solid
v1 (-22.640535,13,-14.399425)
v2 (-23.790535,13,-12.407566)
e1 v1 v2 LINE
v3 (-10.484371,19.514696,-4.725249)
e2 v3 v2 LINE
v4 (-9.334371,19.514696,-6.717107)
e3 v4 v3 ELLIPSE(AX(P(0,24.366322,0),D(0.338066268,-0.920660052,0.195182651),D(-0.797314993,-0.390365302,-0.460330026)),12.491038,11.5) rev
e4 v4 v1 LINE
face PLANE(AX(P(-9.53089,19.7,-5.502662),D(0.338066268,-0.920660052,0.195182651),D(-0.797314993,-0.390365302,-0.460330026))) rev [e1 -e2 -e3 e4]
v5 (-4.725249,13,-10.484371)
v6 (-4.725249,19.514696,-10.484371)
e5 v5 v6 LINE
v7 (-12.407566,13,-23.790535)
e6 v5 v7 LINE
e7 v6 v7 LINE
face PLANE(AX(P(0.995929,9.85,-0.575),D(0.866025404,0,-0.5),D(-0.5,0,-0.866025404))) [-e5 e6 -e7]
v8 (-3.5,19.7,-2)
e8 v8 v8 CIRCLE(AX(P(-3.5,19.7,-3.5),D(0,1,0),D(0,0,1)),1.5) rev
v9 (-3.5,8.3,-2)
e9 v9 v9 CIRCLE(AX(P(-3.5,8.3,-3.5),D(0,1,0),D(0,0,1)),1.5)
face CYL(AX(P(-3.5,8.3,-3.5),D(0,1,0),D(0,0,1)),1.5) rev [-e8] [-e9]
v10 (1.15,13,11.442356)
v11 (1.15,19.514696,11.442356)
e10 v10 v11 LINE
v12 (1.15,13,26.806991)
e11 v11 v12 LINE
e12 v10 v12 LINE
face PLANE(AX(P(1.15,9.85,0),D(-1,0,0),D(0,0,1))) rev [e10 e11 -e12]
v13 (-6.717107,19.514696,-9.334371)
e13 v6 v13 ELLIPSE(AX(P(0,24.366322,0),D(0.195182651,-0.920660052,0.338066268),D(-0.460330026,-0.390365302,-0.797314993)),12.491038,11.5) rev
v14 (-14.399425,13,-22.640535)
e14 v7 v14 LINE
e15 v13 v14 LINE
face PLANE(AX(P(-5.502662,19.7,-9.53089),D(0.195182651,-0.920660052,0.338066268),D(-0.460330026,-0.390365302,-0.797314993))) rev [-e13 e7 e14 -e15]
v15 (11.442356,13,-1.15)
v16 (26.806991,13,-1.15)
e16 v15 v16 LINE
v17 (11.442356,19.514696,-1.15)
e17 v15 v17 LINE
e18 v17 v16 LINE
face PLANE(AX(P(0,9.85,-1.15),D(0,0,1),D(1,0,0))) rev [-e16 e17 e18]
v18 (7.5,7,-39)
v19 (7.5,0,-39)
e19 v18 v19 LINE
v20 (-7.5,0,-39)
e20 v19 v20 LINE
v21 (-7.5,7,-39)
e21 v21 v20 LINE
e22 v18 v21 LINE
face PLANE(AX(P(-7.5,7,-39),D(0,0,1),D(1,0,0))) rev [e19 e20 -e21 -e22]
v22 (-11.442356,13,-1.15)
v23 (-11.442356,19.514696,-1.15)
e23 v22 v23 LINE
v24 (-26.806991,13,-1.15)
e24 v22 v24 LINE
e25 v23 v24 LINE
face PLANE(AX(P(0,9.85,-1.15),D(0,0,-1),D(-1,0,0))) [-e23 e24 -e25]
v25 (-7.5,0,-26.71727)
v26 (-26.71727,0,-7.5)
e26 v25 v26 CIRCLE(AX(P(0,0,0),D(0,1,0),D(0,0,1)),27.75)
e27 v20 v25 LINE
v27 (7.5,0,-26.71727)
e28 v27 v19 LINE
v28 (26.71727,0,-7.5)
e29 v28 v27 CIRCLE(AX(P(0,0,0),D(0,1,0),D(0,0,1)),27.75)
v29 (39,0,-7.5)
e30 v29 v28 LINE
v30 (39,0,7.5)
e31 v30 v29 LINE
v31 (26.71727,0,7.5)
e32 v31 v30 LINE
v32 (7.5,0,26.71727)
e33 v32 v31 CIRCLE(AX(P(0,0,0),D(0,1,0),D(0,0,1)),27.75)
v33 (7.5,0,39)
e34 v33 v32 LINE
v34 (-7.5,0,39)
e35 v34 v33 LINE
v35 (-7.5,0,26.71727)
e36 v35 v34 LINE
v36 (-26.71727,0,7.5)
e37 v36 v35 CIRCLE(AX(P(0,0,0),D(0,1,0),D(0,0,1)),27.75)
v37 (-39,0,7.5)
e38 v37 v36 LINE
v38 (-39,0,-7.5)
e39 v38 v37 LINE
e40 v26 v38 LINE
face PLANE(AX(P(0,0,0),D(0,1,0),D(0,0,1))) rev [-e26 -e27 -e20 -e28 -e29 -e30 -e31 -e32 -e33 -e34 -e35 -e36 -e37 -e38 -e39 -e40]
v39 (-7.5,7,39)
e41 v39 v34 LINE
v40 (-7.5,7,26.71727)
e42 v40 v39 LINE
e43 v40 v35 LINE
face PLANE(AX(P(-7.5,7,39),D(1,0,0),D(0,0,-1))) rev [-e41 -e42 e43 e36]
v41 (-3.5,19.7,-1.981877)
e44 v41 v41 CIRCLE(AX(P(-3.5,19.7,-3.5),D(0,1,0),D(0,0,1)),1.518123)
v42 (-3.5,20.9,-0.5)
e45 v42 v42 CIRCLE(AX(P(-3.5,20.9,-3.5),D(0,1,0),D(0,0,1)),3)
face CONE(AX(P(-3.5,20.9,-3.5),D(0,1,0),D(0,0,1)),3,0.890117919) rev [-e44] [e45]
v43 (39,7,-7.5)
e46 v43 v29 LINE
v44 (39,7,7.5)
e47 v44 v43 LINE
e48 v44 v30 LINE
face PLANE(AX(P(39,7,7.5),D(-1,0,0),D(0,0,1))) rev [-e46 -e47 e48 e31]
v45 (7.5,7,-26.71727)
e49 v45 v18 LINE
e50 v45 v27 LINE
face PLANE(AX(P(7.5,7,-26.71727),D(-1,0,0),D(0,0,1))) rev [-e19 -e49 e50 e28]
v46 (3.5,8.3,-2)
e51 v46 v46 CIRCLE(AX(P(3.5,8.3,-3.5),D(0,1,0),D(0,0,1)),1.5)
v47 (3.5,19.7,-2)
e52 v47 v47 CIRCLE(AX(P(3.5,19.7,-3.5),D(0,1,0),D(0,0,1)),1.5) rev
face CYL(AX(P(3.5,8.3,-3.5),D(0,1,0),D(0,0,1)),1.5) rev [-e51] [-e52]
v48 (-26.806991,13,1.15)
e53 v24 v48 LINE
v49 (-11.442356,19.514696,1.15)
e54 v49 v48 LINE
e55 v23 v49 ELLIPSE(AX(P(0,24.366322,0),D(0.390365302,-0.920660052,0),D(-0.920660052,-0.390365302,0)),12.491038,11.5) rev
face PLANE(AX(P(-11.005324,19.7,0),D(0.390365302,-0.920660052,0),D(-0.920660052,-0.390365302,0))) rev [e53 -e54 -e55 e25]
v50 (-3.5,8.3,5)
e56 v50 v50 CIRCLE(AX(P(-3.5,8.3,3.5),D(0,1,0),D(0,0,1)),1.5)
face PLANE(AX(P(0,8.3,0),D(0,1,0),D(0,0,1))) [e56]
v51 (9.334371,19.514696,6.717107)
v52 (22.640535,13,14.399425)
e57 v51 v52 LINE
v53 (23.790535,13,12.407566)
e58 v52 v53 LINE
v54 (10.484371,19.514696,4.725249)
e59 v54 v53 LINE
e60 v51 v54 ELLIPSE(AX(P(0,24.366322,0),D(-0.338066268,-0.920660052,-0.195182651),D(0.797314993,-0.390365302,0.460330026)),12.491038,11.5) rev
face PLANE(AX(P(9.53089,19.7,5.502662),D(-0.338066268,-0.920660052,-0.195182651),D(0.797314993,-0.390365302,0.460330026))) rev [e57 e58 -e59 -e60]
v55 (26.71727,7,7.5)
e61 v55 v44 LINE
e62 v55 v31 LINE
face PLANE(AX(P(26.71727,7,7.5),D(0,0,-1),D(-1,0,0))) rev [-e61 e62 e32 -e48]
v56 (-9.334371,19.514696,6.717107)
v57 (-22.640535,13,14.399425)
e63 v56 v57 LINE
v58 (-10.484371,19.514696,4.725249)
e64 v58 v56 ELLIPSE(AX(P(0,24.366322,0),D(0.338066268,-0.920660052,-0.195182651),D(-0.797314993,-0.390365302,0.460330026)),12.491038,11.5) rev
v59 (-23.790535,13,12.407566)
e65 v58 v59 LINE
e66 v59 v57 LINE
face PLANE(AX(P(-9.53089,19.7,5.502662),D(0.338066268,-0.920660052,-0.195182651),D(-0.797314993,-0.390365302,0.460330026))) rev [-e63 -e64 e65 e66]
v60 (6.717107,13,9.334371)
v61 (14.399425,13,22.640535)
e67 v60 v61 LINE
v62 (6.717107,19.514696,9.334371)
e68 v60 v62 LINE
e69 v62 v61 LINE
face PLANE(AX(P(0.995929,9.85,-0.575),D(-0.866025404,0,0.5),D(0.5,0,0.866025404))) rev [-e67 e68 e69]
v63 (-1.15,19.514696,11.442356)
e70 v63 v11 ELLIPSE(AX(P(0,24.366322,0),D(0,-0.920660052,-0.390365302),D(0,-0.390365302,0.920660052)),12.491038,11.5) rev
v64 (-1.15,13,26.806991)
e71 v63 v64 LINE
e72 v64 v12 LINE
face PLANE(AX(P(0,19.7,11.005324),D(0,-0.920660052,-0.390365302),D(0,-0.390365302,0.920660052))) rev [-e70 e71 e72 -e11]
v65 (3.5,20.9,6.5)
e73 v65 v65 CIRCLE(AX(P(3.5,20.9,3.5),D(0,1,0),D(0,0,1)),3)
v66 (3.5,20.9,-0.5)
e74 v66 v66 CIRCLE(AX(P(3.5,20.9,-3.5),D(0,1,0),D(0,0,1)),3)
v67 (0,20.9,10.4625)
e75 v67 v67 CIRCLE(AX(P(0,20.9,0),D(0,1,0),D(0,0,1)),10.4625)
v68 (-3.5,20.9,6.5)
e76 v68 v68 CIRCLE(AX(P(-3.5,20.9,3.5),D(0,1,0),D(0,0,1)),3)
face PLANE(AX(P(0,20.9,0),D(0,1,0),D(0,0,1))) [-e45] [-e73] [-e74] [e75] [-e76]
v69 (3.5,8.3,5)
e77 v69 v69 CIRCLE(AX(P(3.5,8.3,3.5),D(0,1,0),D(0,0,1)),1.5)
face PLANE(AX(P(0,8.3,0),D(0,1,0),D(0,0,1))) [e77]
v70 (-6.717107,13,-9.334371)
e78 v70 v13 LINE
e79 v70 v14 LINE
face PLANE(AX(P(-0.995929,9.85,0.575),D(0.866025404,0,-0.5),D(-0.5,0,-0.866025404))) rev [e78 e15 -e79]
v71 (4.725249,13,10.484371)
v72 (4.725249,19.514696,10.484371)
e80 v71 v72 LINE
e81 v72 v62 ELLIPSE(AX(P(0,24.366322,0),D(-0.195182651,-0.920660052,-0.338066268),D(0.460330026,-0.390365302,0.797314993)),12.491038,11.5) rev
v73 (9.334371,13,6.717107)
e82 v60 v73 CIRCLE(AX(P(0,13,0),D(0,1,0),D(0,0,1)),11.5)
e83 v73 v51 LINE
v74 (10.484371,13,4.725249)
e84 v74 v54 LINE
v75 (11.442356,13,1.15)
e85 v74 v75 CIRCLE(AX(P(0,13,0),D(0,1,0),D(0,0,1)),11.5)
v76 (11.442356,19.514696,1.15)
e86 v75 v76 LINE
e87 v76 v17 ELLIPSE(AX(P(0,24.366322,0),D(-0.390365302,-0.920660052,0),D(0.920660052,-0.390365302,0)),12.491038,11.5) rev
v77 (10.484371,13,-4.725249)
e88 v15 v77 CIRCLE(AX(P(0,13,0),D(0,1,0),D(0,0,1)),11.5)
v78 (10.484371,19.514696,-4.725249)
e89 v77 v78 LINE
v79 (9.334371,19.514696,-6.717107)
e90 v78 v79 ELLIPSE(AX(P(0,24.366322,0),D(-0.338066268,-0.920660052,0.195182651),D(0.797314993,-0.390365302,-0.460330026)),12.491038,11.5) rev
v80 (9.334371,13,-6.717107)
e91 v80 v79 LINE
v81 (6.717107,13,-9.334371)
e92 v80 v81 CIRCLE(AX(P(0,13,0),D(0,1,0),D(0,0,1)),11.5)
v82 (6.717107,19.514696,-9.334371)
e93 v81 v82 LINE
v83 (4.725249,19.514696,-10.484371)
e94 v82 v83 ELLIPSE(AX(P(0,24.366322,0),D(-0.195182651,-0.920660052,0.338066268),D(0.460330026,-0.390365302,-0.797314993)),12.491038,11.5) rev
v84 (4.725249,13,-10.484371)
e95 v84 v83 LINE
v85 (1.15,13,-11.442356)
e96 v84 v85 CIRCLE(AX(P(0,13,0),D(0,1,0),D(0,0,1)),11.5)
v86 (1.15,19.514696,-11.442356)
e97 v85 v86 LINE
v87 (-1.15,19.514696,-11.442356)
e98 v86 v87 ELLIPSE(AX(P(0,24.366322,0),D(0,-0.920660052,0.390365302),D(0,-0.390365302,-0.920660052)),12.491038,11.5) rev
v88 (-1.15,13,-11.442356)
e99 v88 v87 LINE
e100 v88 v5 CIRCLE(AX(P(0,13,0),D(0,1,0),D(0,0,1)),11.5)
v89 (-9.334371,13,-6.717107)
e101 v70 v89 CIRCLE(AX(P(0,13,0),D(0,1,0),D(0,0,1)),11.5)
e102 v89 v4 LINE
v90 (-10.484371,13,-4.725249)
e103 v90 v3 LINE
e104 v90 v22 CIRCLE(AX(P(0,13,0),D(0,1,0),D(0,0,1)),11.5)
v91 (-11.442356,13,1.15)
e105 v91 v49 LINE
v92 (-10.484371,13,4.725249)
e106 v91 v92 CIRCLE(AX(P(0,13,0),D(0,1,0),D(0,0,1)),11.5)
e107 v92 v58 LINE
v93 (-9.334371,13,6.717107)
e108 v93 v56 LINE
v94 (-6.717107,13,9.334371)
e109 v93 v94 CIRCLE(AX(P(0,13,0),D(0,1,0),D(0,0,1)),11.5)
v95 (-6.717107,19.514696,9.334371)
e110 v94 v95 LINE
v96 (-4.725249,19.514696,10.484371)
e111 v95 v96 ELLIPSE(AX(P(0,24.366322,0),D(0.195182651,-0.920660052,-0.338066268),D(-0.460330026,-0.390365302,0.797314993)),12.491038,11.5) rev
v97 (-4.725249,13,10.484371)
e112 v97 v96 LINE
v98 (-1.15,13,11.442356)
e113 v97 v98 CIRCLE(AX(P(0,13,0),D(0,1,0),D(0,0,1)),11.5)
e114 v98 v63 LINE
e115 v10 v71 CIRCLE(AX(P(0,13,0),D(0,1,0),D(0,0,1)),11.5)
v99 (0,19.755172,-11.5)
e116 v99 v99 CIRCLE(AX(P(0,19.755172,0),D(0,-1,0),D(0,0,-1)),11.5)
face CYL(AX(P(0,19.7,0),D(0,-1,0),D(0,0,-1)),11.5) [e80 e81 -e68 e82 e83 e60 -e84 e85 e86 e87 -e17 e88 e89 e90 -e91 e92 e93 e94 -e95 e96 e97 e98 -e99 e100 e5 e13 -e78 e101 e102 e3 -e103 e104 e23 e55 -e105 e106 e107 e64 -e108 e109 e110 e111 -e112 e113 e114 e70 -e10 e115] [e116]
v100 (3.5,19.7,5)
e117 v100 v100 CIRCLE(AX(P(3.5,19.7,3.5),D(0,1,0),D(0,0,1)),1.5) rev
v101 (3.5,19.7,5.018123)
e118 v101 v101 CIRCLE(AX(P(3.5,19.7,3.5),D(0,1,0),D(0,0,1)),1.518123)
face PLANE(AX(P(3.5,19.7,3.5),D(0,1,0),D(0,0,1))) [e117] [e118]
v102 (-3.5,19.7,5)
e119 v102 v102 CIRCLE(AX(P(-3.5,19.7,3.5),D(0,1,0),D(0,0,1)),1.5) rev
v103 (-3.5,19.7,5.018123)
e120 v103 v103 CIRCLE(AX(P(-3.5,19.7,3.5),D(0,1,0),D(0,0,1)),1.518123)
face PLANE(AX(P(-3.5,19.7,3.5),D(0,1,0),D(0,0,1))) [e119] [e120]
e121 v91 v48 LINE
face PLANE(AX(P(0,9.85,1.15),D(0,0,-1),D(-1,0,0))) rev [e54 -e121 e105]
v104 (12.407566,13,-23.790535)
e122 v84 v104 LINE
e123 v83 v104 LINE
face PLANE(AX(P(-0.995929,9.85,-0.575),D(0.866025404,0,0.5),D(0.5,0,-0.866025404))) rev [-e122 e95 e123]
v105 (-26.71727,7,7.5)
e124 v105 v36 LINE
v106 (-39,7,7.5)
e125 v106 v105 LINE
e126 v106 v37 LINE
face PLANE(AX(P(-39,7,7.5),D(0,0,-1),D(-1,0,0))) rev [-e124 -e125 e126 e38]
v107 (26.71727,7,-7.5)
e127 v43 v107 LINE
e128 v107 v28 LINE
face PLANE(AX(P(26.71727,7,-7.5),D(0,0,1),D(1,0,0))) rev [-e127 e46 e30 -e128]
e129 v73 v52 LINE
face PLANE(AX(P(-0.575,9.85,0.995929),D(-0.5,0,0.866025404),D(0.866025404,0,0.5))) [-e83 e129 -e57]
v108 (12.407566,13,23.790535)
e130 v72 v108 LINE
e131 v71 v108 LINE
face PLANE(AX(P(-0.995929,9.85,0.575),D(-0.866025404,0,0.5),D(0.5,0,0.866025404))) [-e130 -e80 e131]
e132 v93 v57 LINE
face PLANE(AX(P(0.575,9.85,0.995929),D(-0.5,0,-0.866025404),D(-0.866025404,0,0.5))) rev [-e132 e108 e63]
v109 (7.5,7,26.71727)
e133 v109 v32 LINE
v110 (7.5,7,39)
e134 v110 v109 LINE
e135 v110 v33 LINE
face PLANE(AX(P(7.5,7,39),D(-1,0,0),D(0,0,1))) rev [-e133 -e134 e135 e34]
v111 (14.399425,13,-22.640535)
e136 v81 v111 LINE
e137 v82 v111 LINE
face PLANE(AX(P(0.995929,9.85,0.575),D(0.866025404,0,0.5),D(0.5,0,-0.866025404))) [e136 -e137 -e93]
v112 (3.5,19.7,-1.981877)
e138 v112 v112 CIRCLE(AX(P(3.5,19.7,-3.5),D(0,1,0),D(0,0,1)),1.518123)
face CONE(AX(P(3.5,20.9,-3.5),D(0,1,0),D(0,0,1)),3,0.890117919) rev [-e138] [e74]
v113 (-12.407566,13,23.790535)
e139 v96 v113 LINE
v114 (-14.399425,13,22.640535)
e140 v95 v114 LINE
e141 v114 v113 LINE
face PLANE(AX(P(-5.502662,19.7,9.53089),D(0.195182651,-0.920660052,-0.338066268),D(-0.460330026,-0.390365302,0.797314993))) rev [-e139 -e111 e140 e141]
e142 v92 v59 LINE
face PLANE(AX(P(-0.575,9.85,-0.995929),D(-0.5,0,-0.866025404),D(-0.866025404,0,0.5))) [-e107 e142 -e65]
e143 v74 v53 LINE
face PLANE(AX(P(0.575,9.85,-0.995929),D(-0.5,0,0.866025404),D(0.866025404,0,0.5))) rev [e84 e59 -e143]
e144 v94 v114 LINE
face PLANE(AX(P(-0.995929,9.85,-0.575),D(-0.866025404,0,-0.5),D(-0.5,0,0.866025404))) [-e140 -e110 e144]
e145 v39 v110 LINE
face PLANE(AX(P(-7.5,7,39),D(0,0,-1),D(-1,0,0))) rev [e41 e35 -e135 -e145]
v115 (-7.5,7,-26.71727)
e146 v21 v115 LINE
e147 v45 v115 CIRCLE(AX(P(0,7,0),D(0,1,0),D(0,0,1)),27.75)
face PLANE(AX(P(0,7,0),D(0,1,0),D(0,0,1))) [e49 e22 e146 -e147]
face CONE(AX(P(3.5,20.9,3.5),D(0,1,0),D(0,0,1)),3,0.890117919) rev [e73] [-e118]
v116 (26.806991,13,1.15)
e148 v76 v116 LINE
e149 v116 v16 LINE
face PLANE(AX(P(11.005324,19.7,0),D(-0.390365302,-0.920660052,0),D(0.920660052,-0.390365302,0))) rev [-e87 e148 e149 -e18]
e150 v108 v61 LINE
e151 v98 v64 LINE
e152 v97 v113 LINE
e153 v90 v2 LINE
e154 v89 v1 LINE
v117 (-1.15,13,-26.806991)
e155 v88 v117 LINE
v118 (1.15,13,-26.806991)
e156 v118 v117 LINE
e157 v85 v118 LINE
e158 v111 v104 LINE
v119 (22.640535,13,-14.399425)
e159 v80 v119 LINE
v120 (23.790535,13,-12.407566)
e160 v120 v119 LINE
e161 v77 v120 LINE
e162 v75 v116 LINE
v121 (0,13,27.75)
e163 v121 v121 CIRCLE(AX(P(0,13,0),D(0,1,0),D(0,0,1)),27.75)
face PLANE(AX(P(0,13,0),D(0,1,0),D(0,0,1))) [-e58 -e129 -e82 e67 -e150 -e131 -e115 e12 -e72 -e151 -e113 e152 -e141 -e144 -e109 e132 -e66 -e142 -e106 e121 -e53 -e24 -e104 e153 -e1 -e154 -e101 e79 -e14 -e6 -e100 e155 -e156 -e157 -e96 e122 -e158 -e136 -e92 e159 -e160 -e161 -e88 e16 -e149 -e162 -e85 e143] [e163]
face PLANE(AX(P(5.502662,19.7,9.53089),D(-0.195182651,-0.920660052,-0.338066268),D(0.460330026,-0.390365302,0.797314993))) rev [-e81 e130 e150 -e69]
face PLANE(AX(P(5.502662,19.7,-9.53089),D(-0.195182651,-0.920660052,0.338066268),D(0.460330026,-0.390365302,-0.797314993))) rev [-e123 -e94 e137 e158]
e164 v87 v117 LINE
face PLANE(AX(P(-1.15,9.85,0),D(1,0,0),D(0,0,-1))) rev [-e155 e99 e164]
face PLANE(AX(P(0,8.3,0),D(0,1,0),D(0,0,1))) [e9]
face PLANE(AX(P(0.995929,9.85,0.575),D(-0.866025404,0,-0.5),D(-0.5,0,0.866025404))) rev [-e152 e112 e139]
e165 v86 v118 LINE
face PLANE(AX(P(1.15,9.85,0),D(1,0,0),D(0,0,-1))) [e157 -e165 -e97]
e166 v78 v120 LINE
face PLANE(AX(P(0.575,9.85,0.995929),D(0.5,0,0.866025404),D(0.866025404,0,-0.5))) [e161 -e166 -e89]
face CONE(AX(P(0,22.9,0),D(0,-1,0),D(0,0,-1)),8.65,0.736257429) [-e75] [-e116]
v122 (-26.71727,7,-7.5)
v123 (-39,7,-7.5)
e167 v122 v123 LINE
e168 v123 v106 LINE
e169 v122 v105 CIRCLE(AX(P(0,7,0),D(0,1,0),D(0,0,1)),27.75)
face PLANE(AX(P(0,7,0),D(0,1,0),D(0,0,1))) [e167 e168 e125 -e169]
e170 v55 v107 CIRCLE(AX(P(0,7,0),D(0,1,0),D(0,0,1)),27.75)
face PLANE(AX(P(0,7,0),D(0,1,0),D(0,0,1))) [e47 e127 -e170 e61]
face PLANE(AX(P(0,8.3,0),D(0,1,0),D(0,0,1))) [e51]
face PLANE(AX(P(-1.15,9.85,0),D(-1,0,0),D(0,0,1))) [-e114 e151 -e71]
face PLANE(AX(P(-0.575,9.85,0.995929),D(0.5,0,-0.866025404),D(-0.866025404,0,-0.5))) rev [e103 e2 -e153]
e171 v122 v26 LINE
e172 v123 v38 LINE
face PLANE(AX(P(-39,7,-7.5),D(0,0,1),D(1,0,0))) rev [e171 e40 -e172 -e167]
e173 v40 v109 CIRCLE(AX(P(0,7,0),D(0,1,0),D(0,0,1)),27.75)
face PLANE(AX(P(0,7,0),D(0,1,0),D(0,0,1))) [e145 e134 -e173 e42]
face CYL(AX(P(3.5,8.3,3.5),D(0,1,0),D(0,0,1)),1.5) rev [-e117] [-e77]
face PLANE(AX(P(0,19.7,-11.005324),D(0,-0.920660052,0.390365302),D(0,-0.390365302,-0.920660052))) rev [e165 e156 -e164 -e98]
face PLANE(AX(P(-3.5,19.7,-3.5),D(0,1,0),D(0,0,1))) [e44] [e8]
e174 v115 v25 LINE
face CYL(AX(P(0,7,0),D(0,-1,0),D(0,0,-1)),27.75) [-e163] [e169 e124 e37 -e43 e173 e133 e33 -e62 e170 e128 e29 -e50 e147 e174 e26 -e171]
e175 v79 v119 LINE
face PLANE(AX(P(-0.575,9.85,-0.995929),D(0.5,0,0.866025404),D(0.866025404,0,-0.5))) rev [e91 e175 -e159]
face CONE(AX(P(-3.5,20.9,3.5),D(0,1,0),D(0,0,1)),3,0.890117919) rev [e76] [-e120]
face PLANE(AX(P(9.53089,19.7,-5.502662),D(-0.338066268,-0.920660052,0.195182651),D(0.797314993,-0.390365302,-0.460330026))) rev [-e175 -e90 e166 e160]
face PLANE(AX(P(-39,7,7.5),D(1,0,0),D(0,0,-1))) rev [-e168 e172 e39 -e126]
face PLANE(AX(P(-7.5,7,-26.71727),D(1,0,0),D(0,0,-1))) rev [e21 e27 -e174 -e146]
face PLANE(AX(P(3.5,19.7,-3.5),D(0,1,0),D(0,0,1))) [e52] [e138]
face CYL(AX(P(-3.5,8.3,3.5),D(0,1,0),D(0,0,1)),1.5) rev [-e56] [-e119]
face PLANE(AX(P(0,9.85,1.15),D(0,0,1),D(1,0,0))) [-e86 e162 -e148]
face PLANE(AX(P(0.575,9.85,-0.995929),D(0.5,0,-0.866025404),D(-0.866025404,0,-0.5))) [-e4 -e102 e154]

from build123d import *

# Parameters (mm, degrees)
SALIENTE_EXTRUIR1_DEPTH         = 7
CROQUIS2_R                      = 27.75
SALIENTE_EXTRUIR2_DEPTH         = 6
CROQUIS3_R                      = 11.5
SALIENTE_EXTRUIR3_DEPTH         = 6.7
NERVIO5_START                   = -19.605376538
NERVIO5_OUTLINE_W               = 2.3
NERVIO5_OUTLINE_H               = 7.43309969
NERVIO5_DEPTH                   = 16.688717133
MATRIZC1_COUNT                  = 12
CROQUIS5_R                      = 8.65
SALIENTE_EXTRUIR4_DEPTH         = 1.2
CHAFL_N1_SIZE                   = 2.9
CHAFL_N1_SIZE_2                 = 3.2
CORTAR_EXTRUIR1_DEPTH           = 12.6
CROQUIS7_R                      = 3
CORTAR_EXTRUIR2_DEPTH           = 1.2
CORTAR_EXTRUIR2_DRAFT           = -51
CORTAR_EXTRUIR2_PROFILE_2_DEPTH = 1.2
CORTAR_EXTRUIR2_PROFILE_2_DRAFT = -51
CORTAR_EXTRUIR2_PROFILE_3_DEPTH = 1.2
CORTAR_EXTRUIR2_PROFILE_3_DRAFT = -51
CORTAR_EXTRUIR2_PROFILE_4_DEPTH = 1.2
CORTAR_EXTRUIR2_PROFILE_4_DRAFT = -51


# Read off the part's stored shape, not the designer's step: Nervio5
with BuildPart() as part:
    # Croquis1 → Saliente-Extruir1 (new body)
    with BuildSketch(Plane(origin=(0, 0, 0), x_dir=(1, 0, 0), z_dir=(0, 1, 0))):
        with BuildLine():
            Line((-7.5, -39), (7.5, -39))
            Line((7.5, -39), (7.5, -26.717269696))
            ThreePointArc((7.5, -26.717269696), (19.622213178, -19.622213178), (26.717269696, -7.5))
            Line((26.717269696, -7.5), (39, -7.5))
            Line((39, -7.5), (39, 7.5))
            Line((39, 7.5), (26.717269696, 7.5))
            ThreePointArc((26.717269696, 7.5), (19.622213178, 19.622213178), (7.5, 26.717269696))
            Line((7.5, 26.717269696), (7.5, 39))
            Line((7.5, 39), (-7.5, 39))
            Line((-7.5, 39), (-7.5, 26.717269696))
            ThreePointArc((-7.5, 26.717269696), (-19.622213178, 19.622213178), (-26.717269696, 7.5))
            Line((-26.717269696, 7.5), (-39, 7.5))
            Line((-39, 7.5), (-39, -7.5))
            Line((-39, -7.5), (-26.717269696, -7.5))
            ThreePointArc((-26.717269696, -7.5), (-19.622213178, -19.622213178), (-7.5, -26.717269696))
            Line((-7.5, -26.717269696), (-7.5, -39))
        make_face()
    extrude(amount=SALIENTE_EXTRUIR1_DEPTH)

    # Croquis2 → Saliente-Extruir2 (add)
    with BuildSketch(Plane(origin=(0, 7, 0), x_dir=(1, 0, 0), z_dir=(0, 1, 0))):
        with Locations(Location((0, 0, 0), (0, 0, 105.680350135))):
            Circle(CROQUIS2_R)
    extrude(amount=SALIENTE_EXTRUIR2_DEPTH)

    # Croquis3 → Saliente-Extruir3 (add)
    with BuildSketch(Plane(origin=(0, 13, 0), x_dir=(1, 0, 0), z_dir=(0, 1, 0))):
        with Locations(Location((0, 0, 0), (0, 0, 270))):
            Circle(CROQUIS3_R)
    extrude(amount=SALIENTE_EXTRUIR3_DEPTH)

    # Nervio5 outline → Nervio5 (add)
    with BuildSketch(Plane(origin=(0, 0, 0), x_dir=(1, 0, 0), z_dir=(0, 0.39036530164811784, 0.9206600519568415)).offset(NERVIO5_START)):
        with Locations((0, 18.716549845)):
            Rectangle(NERVIO5_OUTLINE_W, NERVIO5_OUTLINE_H)
    nervio5 = extrude(amount=NERVIO5_DEPTH)

    # MatrizC1: Nervio5 ×12 about axis
    matrizc1_axis = Axis((0, 0, 0), (0, 1, 0))
    for i in range(1, MATRIZC1_COUNT):
        add(nervio5.rotate(matrizc1_axis, i * 360 / MATRIZC1_COUNT))

    # Croquis5 → Saliente-Extruir4 (add)
    with BuildSketch(Plane(origin=(0, 19.7, 0), x_dir=(1, 0, 0), z_dir=(0, 1, 0))):
        with Locations(Location((0, 0, 0), (0, 0, 270))):
            Circle(CROQUIS5_R)
    extrude(amount=SALIENTE_EXTRUIR4_DEPTH)

    # Chaflán1
    # the kernel refuses this chamfer: 3.2, 2.9 mm, written as the material it adds along each edge
    with BuildSketch(Plane(origin=(0, 19.7, 0), x_dir=(0, 0, 1), z_dir=(-1, 0, 0))) as chafl_n1_piece_1_section:
        Polygon((8.65 + CHAFL_N1_SIZE, 0), (8.65, CHAFL_N1_SIZE_2), (8.65, 0), align=None)
    chafl_n1_piece_1 = revolve(axis=Axis((0, 19.7, 0), (0, 1, 0)), mode=Mode.PRIVATE)
    chafl_n1_piece_1 = chafl_n1_piece_1 & Plane(origin=(0, 20.288796189, 0), x_dir=(0, 0, 1), z_dir=(0, -1, 0)) * Cylinder(11.5, 47, mode=Mode.PRIVATE)
    chafl_n1_piece_1 = split(chafl_n1_piece_1, bisect_by=Plane(origin=(0, 20.9, -10.938447221), z_dir=(0, -1, 0)), keep=Keep.TOP, mode=Mode.PRIVATE)
    add(chafl_n1_piece_1)

    # Croquis6 → Cortar-Extruir1 (cut)
    with BuildSketch(Plane(origin=(0, 20.9, 0), x_dir=(1, 0, 0), z_dir=(0, 1, 0))):
        with BuildLine():
            ThreePointArc((-2, 3.5), (-4.560660172, 4.560660172), (-3.5, 2))
            Line((-3.5, 2), (-3.5, 3.5))
            Line((-3.5, 3.5), (-2, 3.5))
        make_face()
        with BuildLine():
            Line((-3.5, 3.5), (-3.5, 2))
            ThreePointArc((-3.5, 2), (-2.439339828, 2.439339828), (-2, 3.5))
            Line((-2, 3.5), (-3.5, 3.5))
        make_face()
        with BuildLine():
            ThreePointArc((2, 3.5), (2.439339828, 2.439339828), (3.5, 2))
            Line((3.5, 2), (3.5, 3.5))
            Line((3.5, 3.5), (2, 3.5))
        make_face()
        with BuildLine():
            Line((3.5, 3.5), (3.5, 2))
            ThreePointArc((3.5, 2), (4.560660172, 2.439339828), (5, 3.5))
            ThreePointArc((5, 3.5), (3.5, 5), (2, 3.5))
            Line((2, 3.5), (3.5, 3.5))
        make_face()
        with BuildLine():
            ThreePointArc((3.5, -2), (2.439339828, -2.439339828), (2, -3.5))
            Line((2, -3.5), (3.5, -3.5))
            Line((3.5, -3.5), (3.5, -2))
        make_face()
        with BuildLine():
            Line((3.5, -3.5), (2, -3.5))
            ThreePointArc((2, -3.5), (3.5, -5), (5, -3.5))
            ThreePointArc((5, -3.5), (4.560660172, -2.439339828), (3.5, -2))
            Line((3.5, -2), (3.5, -3.5))
        make_face()
        with BuildLine():
            Line((-3.5, -2), (-3.5, -3.5))
            Line((-3.5, -3.5), (-2, -3.5))
            ThreePointArc((-2, -3.5), (-2.439339828, -2.439339828), (-3.5, -2))
        make_face()
        with BuildLine():
            Line((-2, -3.5), (-3.5, -3.5))
            Line((-3.5, -3.5), (-3.5, -2))
            ThreePointArc((-3.5, -2), (-4.560660172, -4.560660172), (-2, -3.5))
        make_face()
    extrude(amount=-CORTAR_EXTRUIR1_DEPTH, mode=Mode.SUBTRACT)


with BuildPart() as cortar_extruir2_tool:
    # Croquis7 → Cortar-Extruir2 (with draft: the straight prism first)
    with BuildSketch(Plane(origin=(0, 20.9, 0), x_dir=(1, 0, 0), z_dir=(0, 1, 0))):
        with Locations((-3.5, 3.5)):
            Circle(CROQUIS7_R)
    extrude(amount=-CORTAR_EXTRUIR2_DEPTH)
    # Cortar-Extruir2: the draft: its side faces are tilted about the plane it starts from
    cortar_extruir2_sides = [cortar_extruir2_tool.faces().sort_by_distance(p)[0] for p in [
        (-6.5, 20.3, -3.5),
    ]]
    draft(cortar_extruir2_sides, Plane(origin=(0, 20.9, 0), x_dir=(1, 0, 0), z_dir=(0, 1, 0)), CORTAR_EXTRUIR2_DRAFT)


with BuildPart() as part_1:
    add(part.part)

    # Cortar-Extruir2: cut by cortar_extruir2_tool
    add(cortar_extruir2_tool.part, mode=Mode.SUBTRACT)


with BuildPart() as cortar_extruir2_profile_2_tool:
    # Croquis7 → Cortar-Extruir2 profile 2 (with draft: the straight prism first)
    with BuildSketch(Plane(origin=(0, 20.9, 0), x_dir=(1, 0, 0), z_dir=(0, 1, 0))):
        with Locations((3.5, 3.5)):
            Circle(CROQUIS7_R)
    extrude(amount=-CORTAR_EXTRUIR2_PROFILE_2_DEPTH)
    # Cortar-Extruir2 profile 2: the draft: its side faces are tilted about the plane it starts from
    cortar_extruir2_profile_2_sides = [cortar_extruir2_profile_2_tool.faces().sort_by_distance(p)[0] for p in [
        (0.5, 20.3, -3.5),
    ]]
    draft(cortar_extruir2_profile_2_sides, Plane(origin=(0, 20.9, 0), x_dir=(1, 0, 0), z_dir=(0, 1, 0)), CORTAR_EXTRUIR2_PROFILE_2_DRAFT)


with BuildPart() as part_2:
    add(part_1.part)

    # Cortar-Extruir2 profile 2: cut by cortar_extruir2_profile_2_tool
    add(cortar_extruir2_profile_2_tool.part, mode=Mode.SUBTRACT)


with BuildPart() as cortar_extruir2_profile_3_tool:
    # Croquis7 → Cortar-Extruir2 profile 3 (with draft: the straight prism first)
    with BuildSketch(Plane(origin=(0, 20.9, 0), x_dir=(1, 0, 0), z_dir=(0, 1, 0))):
        with Locations((3.5, -3.5)):
            Circle(CROQUIS7_R)
    extrude(amount=-CORTAR_EXTRUIR2_PROFILE_3_DEPTH)
    # Cortar-Extruir2 profile 3: the draft: its side faces are tilted about the plane it starts from
    cortar_extruir2_profile_3_sides = [cortar_extruir2_profile_3_tool.faces().sort_by_distance(p)[0] for p in [
        (0.5, 20.3, 3.5),
    ]]
    draft(cortar_extruir2_profile_3_sides, Plane(origin=(0, 20.9, 0), x_dir=(1, 0, 0), z_dir=(0, 1, 0)), CORTAR_EXTRUIR2_PROFILE_3_DRAFT)


with BuildPart() as part_3:
    add(part_2.part)

    # Cortar-Extruir2 profile 3: cut by cortar_extruir2_profile_3_tool
    add(cortar_extruir2_profile_3_tool.part, mode=Mode.SUBTRACT)


with BuildPart() as cortar_extruir2_profile_4_tool:
    # Croquis7 → Cortar-Extruir2 profile 4 (with draft: the straight prism first)
    with BuildSketch(Plane(origin=(0, 20.9, 0), x_dir=(1, 0, 0), z_dir=(0, 1, 0))):
        with Locations((-3.5, -3.5)):
            Circle(CROQUIS7_R)
    extrude(amount=-CORTAR_EXTRUIR2_PROFILE_4_DEPTH)
    # Cortar-Extruir2 profile 4: the draft: its side faces are tilted about the plane it starts from
    cortar_extruir2_profile_4_sides = [cortar_extruir2_profile_4_tool.faces().sort_by_distance(p)[0] for p in [
        (-6.5, 20.3, 3.5),
    ]]
    draft(cortar_extruir2_profile_4_sides, Plane(origin=(0, 20.9, 0), x_dir=(1, 0, 0), z_dir=(0, 1, 0)), CORTAR_EXTRUIR2_PROFILE_4_DRAFT)


with BuildPart() as part_4:
    add(part_3.part)

    # Cortar-Extruir2 profile 4: cut by cortar_extruir2_profile_4_tool
    add(cortar_extruir2_profile_4_tool.part, mode=Mode.SUBTRACT)


solid = part_4.part
